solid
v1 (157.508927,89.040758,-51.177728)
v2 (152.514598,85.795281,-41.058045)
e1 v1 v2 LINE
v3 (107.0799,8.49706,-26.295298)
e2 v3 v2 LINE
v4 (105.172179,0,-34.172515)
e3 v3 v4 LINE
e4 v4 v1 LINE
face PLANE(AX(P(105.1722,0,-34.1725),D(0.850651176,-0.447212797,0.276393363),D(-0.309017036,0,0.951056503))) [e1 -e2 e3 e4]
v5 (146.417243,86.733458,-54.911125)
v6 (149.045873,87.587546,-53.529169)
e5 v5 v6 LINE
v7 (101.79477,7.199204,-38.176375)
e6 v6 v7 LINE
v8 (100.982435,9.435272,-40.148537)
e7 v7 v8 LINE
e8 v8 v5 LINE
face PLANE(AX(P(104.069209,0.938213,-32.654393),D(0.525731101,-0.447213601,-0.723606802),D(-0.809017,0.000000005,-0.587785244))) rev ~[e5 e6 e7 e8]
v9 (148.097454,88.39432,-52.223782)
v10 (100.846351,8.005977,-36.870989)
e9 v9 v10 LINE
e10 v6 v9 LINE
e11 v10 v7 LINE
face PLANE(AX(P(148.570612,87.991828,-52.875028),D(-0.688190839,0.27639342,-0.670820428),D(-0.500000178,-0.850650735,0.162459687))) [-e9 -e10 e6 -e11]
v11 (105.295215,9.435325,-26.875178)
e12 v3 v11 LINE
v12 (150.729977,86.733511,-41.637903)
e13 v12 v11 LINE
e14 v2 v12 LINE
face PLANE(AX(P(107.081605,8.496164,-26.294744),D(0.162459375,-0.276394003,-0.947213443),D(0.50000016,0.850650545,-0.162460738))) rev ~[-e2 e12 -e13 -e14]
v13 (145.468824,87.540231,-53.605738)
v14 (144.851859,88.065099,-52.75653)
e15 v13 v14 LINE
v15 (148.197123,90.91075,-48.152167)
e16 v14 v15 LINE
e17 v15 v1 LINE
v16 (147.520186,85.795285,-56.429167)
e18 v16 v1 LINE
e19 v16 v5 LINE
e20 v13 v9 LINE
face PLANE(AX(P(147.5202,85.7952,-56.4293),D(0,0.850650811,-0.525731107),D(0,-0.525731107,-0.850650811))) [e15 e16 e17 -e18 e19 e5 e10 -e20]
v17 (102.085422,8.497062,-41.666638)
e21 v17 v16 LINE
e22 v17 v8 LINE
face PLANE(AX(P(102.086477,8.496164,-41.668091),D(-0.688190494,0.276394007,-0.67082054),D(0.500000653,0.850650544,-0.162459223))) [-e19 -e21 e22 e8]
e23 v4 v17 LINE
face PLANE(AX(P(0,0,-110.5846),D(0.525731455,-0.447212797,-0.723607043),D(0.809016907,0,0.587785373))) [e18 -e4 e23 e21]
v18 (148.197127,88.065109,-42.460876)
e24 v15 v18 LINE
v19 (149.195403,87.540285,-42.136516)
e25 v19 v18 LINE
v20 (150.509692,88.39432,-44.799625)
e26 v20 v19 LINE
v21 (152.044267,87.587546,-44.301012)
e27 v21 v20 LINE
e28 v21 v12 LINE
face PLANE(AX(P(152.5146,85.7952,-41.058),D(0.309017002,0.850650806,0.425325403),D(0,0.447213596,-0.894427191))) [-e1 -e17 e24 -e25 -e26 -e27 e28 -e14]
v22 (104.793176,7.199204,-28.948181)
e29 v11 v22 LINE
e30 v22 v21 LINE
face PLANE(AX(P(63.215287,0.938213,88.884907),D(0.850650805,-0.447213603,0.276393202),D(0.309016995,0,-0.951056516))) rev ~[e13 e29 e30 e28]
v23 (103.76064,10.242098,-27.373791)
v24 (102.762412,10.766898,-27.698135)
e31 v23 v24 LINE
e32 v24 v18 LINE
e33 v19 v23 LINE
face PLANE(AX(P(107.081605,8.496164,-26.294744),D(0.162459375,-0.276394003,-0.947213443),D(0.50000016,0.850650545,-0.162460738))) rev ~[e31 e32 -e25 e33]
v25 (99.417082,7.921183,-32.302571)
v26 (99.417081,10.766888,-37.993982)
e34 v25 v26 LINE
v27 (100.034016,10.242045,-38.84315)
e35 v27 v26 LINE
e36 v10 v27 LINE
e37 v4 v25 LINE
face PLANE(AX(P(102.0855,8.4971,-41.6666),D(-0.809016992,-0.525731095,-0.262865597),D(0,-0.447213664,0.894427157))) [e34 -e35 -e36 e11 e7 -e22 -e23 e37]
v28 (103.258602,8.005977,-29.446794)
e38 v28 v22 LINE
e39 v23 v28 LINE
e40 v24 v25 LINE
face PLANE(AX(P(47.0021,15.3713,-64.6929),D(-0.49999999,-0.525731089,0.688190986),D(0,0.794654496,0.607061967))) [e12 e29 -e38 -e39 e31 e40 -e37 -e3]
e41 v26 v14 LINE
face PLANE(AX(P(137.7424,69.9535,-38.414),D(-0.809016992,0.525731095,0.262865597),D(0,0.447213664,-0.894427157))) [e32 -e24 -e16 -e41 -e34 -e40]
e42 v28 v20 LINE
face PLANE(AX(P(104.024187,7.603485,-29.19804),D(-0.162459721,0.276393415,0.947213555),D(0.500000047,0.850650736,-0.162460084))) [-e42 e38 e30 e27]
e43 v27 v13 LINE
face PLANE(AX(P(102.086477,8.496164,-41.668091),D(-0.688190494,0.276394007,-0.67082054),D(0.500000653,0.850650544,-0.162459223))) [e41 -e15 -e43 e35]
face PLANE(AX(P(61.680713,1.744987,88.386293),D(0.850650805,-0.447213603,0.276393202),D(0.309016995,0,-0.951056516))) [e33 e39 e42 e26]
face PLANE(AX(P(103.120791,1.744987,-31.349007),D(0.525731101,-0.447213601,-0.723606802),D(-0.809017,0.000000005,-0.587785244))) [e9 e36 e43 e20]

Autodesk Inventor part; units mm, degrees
sketch "Boceto1" plane through (0, 0, 0) normal (0, 1, 0) x (-1, 0, 0)
  line L0 (65, 89.4648) -> (105.1722, -34.1725)
  line L1 (105.1722, -34.1725) -> (0, -110.5846)
  line L2 (0, -110.5846) -> (-105.1722, -34.1725)
  line L3 (-105.1722, -34.1725) -> (-65, 89.4648)
  line L4 (-65, 89.4648) -> (65, 89.4648)
  line L5 (0, 0) -> (178.9296, 0) construction
  line L6 (178.9296, 0) -> (178.9296, 178.9296) construction
  line L7 (178.9296, 178.9296) -> (0, 178.9296) construction
  line L8 (0, 178.9296) -> (0, 0) construction
  line L9 (178.9296, 178.9296) -> (0, 89.4648)
  dimension "d1" = 289.5143
  dimension "d2" = 26.565
  dimension "d108" = 130
extrude "Extrusión1" add sketch "Boceto1" along normal blind 289.5143 draft 26.565
sketch "Boceto2" plane through (0, 289.5143, 0) normal (0, 1, 0) x (1, 0, 0)
  line L0 (0, -80.8118) -> (-76.8566, -24.9722)
  line L1 (-76.8566, -24.9722) -> (-47.5, 65.3781)
  line L2 (-47.5, 65.3781) -> (47.5, 65.3781)
  line L3 (47.5, 65.3781) -> (76.8566, -24.9722)
  line L4 (76.8566, -24.9722) -> (0, -80.8118)
  point P0 (0, 0)
  point P1 (0, 0)
  dimension "L" = 95
extrude "Extrusión2" cut sketch "Boceto2" against normal blind 289.5143 draft 26.565 keep common part
sketch "Boceto3" plane through (65, 0, 89.4648) normal (0.8506508, -0.4472136, 0.2763932) x (0.309017, 0, -0.9510565)
  line L0 (65, 170.2767) -> (162.346, 99.5507) projected
  line L1 (-32.346, 99.5507) -> (65, 170.2767) projected
  line L2 (0, 0) -> (-32.346, 99.5507) projected
  line L3 (0, 0) -> (130, 0) projected
  line L4 (130, 0) -> (162.346, 99.5507) projected
  line L5 (151.1781, 95.922) -> (65, 158.534)
  line L6 (65, 158.534) -> (-21.1781, 95.922)
  line L7 (-21.1781, 95.922) -> (6.9022, 9.5)
  line L8 (6.9022, 9.5) -> (123.0978, 9.5)
  line L9 (123.0978, 9.5) -> (151.1781, 95.922)
  point P0 (65, -40.0099)
  dimension "D" = 9.5
extrude "Extrusión3" cut sketch "Boceto3" against normal blind 189.5143 contours L9 L8 L7 L6 L5
sketch "Boceto4" plane through (105.1722, 0, -34.1725) normal (0.5257311, -0.4472136, -0.7236068) x (-0.809017, 0, -0.5877853)
  line L0 (65, 170.2767) -> (162.346, 99.5507) projected
  line L1 (-32.346, 99.5507) -> (65, 170.2767) projected
  line L2 (0, 0) -> (-32.346, 99.5507) projected
  line L3 (0, 0) -> (130, 0) projected
  line L4 (130, 0) -> (162.346, 99.5507) projected
  line L5 (123.0978, 9.5) -> (6.9022, 9.5)
  line L6 (6.9022, 9.5) -> (-21.1781, 95.922)
  line L7 (-21.1781, 95.922) -> (65, 158.534)
  line L8 (65, 158.534) -> (151.1781, 95.922)
  line L9 (151.1781, 95.922) -> (123.0978, 9.5)
  point P0 (65, -40.0099)
  dimension "d14" = 9.5
extrude "Extrusión4" cut sketch "Boceto4" against normal blind 189.5143 contours L5 L6 L7 L8 L9
sketch "Boceto5" plane through (0, 0, 0) normal (0, -1, 0) x (1, 0, 0)
  line L0 (105.1722, -34.1725) -> (0, -110.5846) projected
  line L1 (65, 89.4648) -> (105.1722, -34.1725) projected
  line L2 (-65, 89.4648) -> (65, 89.4648) projected
  line L3 (-105.1722, -34.1725) -> (-65, 89.4648) projected
  line L4 (0, -110.5846) -> (-105.1722, -34.1725) projected
  line L5 (58.0978, 79.9648) -> (94.0043, -30.5438)
  line L6 (94.0043, -30.5438) -> (0, -98.842)
  line L7 (0, -98.842) -> (-94.0043, -30.5438)
  line L8 (-94.0043, -30.5438) -> (-58.0978, 79.9648)
  line L9 (-58.0978, 79.9648) -> (58.0978, 79.9648)
  point P0 (0, 0)
  dimension "d17" = 9.5
extrude "Extrusión5" cut sketch "Boceto5" against normal blind 189.5143 contours L5 L6 L7 L8 L9
sketch "Boceto6" plane through (47.5, 289.5143, -65.3781) normal (0, 0.4472136, -0.8944272) x (-1, 0, 0)
  line L0 (47.5, -224.1361) -> (144.846, -153.4101) projected
  line L1 (95, 0) -> (144.846, -153.4101) projected
  line L2 (95, 0) -> (0, 0) projected
  line L3 (0, 0) -> (-49.846, -153.4101) projected
  line L4 (-49.846, -153.4101) -> (47.5, -224.1361) projected
  line L5 (133.6781, -149.7814) -> (47.5, -212.3935)
  line L6 (47.5, -212.3935) -> (-38.6781, -149.7814)
  line L7 (-38.6781, -149.7814) -> (6.9022, -9.5)
  line L8 (6.9022, -9.5) -> (88.0978, -9.5)
  line L9 (88.0978, -9.5) -> (133.6781, -149.7814)
  point P0 (47.5, -229.7114)
  dimension "d20" = 9.5
extrude "Extrusión6" cut sketch "Boceto6" against normal blind 189.5143 contours L5 L6 L7 L8 L9
sketch "Boceto7" plane through (0, 0, -110.5846) normal (-0.5257311, -0.4472136, -0.7236068) x (-0.809017, 0, 0.5877853)
  line L0 (65, 170.2767) -> (162.346, 99.5507) projected
  line L1 (-32.346, 99.5507) -> (65, 170.2767) projected
  line L2 (0, 0) -> (-32.346, 99.5507) projected
  line L3 (0, 0) -> (130, 0) projected
  line L4 (130, 0) -> (162.346, 99.5507) projected
  line L5 (151.1781, 95.922) -> (65, 158.534)
  line L6 (65, 158.534) -> (-21.1781, 95.922)
  line L7 (-21.1781, 95.922) -> (6.9022, 9.5)
  line L8 (6.9022, 9.5) -> (123.0978, 9.5)
  line L9 (123.0978, 9.5) -> (151.1781, 95.922)
  point P0 (65, -40.0099)
  dimension "d23" = 9.5
extrude "Extrusión7" cut sketch "Boceto7" against normal blind 189.5143 contours L9 L8 L7 L6 L5
sketch "Boceto8" plane through (76.8566, 289.5143, 24.9722) normal (0.8506508, 0.4472136, -0.2763932) x (-0.309017, 0, -0.9510565)
  line L0 (47.5, -224.1361) -> (144.846, -153.4101) projected
  line L1 (95, 0) -> (144.846, -153.4101) projected
  line L2 (95, 0) -> (0, 0) projected
  line L3 (0, 0) -> (-49.846, -153.4101) projected
  line L4 (-49.846, -153.4101) -> (47.5, -224.1361) projected
  line L5 (47.5, -212.3935) -> (133.6781, -149.7814)
  line L6 (133.6781, -149.7814) -> (88.0978, -9.5)
  line L7 (88.0978, -9.5) -> (6.9022, -9.5)
  line L8 (6.9022, -9.5) -> (-38.6781, -149.7814)
  line L9 (-38.6781, -149.7814) -> (47.5, -212.3935)
  point P0 (47.5, -229.7114)
  dimension "d26" = 9.5
extrude "Extrusión8" cut sketch "Boceto8" against normal blind 189.5143 contours L9 L8 L7 L6 L5
sketch "Boceto9" plane through (0, 289.5143, 0) normal (0, 1, 0) x (1, 0, 0)
  line L0 (78.7643, -17.095) -> (-82.4461, -69.4755) projected
  line L1 (-47.5, 65.3781) -> (47.5, 65.3781) projected
  line L2 (-76.8566, -24.9722) -> (-47.5, 65.3781) projected
  line L3 (0, -80.8118) -> (-76.8566, -24.9722) projected
  line L4 (76.8566, -24.9722) -> (0, -80.8118) projected
  line L5 (47.5, 65.3781) -> (76.8566, -24.9722) projected
  line L6 (0, -69.0692) -> (-65.6887, -21.3436)
  line L7 (-65.6887, -21.3436) -> (-40.5978, 55.8781)
  line L8 (-40.5978, 55.8781) -> (40.5978, 55.8781)
  line L9 (40.5978, 55.8781) -> (65.6887, -21.3436)
  line L10 (65.6887, -21.3436) -> (0, -69.0692)
  point P0 (0, 0)
  dimension "d29" = 9.5
extrude "Extrusión9" cut sketch "Boceto9" against normal blind 189.5143 contours L10 L6 L0 | L0 L6 L7 L8 L9
sketch "Boceto10" plane through (-47.5, 289.5143, -65.3781) normal (-0.8506508, 0.4472136, -0.2763932) x (-0.309017, 0, 0.9510565)
  line L0 (-49.846, -153.4101) -> (47.5, -224.1361) projected
  line L1 (47.5, -224.1361) -> (144.846, -153.4101) projected
  line L2 (95, 0) -> (144.846, -153.4101) projected
  line L3 (95, 0) -> (0, 0) projected
  line L4 (0, 0) -> (-49.846, -153.4101) projected
  line L5 (133.6781, -149.7814) -> (47.5, -212.3935)
  line L6 (47.5, -212.3935) -> (-38.6781, -149.7814)
  line L7 (-38.6781, -149.7814) -> (6.9022, -9.5)
  line L8 (6.9022, -9.5) -> (88.0978, -9.5)
  line L9 (88.0978, -9.5) -> (133.6781, -149.7814)
  point P0 (47.5, -229.7114)
  dimension "d32" = 9.5
extrude "Extrusión10" cut sketch "Boceto10" against normal blind 189.5143 contours L5 L6 L7 L8 L9
sketch "Boceto11" plane through (-105.1722, 0, -34.1725) normal (-0.8506508, -0.4472136, 0.2763932) x (0.309017, 0, 0.9510565)
  line L0 (93.5693, 85.4327) -> (113.4241, 91.884) projected
  line L1 (-32.346, 99.5507) -> (65, 170.2767) projected
  line L2 (0, 0) -> (-32.346, 99.5507) projected
  line L3 (0, 0) -> (130, 0) projected
  line L4 (130, 0) -> (162.346, 99.5507) projected
  line L5 (65, 170.2767) -> (162.346, 99.5507) projected
  line L6 (151.1781, 95.922) -> (123.0978, 9.5)
  line L7 (123.0978, 9.5) -> (6.9022, 9.5)
  line L8 (6.9022, 9.5) -> (-21.1781, 95.922)
  line L9 (-21.1781, 95.922) -> (65, 158.534)
  line L10 (65, 158.534) -> (151.1781, 95.922)
  point P0 (65, -40.0099)
  point P1 (48.882, 67.2803)
  point P2 (90.6407, 79.3954)
  point P3 (78.7461, 79.1633)
  dimension "d35" = 9.5
extrude "Extrusión11" cut sketch "Boceto11" against normal blind 189.5143 contours L6 L7 L8 L9 L10
sketch "Boceto12" plane through (-65, 0, 89.4648) normal (0, -0.4472136, 0.8944272) x (1, 0, 0)
  line L0 (6.9022, 9.5) -> (97.7716, 134.5711) projected
  line L1 (-32.346, 99.5507) -> (65, 170.2767) projected
  line L2 (0, 0) -> (-32.346, 99.5507) projected
  line L3 (0, 0) -> (130, 0) projected
  line L4 (130, 0) -> (162.346, 99.5507) projected
  line L5 (65, 170.2767) -> (162.346, 99.5507) projected
  line L6 (151.1781, 95.922) -> (123.0978, 9.5)
  line L7 (123.0978, 9.5) -> (6.9022, 9.5)
  line L8 (6.9022, 9.5) -> (-21.1781, 95.922)
  line L9 (-21.1781, 95.922) -> (65, 158.534)
  line L10 (65, 158.534) -> (151.1781, 95.922)
  point P0 (65, -40.0099)
  point P1 (52.5, 72.2601)
  point P2 (45.5555, 62.7017)
  dimension "d38" = 9.5
extrude "Extrusión12" cut sketch "Boceto12" against normal blind 189.5143 contours L6 L7 L8 L9 L10
sketch "Boceto13" plane through (0, 289.5143, 80.8118) normal (0.5257311, 0.4472136, 0.7236068) x (0.809017, 0, -0.5877853)
  line L0 (-49.846, -153.4101) -> (47.5, -224.1361) projected
  line L1 (47.5, -224.1361) -> (144.846, -153.4101) projected
  line L2 (95, 0) -> (144.846, -153.4101) projected
  line L3 (95, 0) -> (0, 0) projected
  line L4 (0, 0) -> (-49.846, -153.4101) projected
  line L5 (47.5, -212.3935) -> (-38.6781, -149.7814)
  line L6 (-38.6781, -149.7814) -> (6.9022, -9.5)
  line L7 (6.9022, -9.5) -> (88.0978, -9.5)
  line L8 (88.0978, -9.5) -> (133.6781, -149.7814)
  line L9 (133.6781, -149.7814) -> (47.5, -212.3935)
  point P0 (47.5, -229.7114)
  dimension "d41" = 9.5
extrude "Extrusión13" cut sketch "Boceto13" against normal blind 189.5143 contours L5 L6 L7 L8 L9
sketch "Boceto14" plane through (-76.8566, 289.5143, 24.9722) normal (-0.5257311, 0.4472136, 0.7236068) x (0.809017, 0, 0.5877853)
  line L0 (-49.846, -153.4101) -> (47.5, -224.1361) projected
  line L1 (47.5, -224.1361) -> (144.846, -153.4101) projected
  line L2 (95, 0) -> (144.846, -153.4101) projected
  line L3 (95, 0) -> (0, 0) projected
  line L4 (0, 0) -> (-49.846, -153.4101) projected
  line L5 (-38.6781, -149.7814) -> (47.5, -212.3935)
  line L6 (47.5, -212.3935) -> (133.6781, -149.7814)
  line L7 (133.6781, -149.7814) -> (88.0978, -9.5)
  line L8 (88.0978, -9.5) -> (6.9022, -9.5)
  line L9 (6.9022, -9.5) -> (-38.6781, -149.7814)
  point P0 (47.5, -229.7114)
  dimension "d44" = 9.5
extrude "Extrusión14" cut sketch "Boceto14" against normal blind 189.5143 contours L9 L8 L7 L6 L5
ref_plane "Plano de trabajo1" through (47.5, 288.1726, -62.6949) normal (0, 0.4472136, -0.8944272) x (-1, 0, 0)
sketch "Boceto15" plane through (47.5, 288.1726, -62.6949) normal (0, 0.4472136, -0.8944272) x (-1, 0, 0)
  line L0 (6.9022, -9.5) -> (88.0978, -9.5) projected
  line L1 (-38.6781, -149.7814) -> (6.9022, -9.5) projected
  line L2 (47.5, -212.3935) -> (-38.6781, -149.7814) projected
  line L3 (133.6781, -149.7814) -> (47.5, -212.3935) projected
  line L4 (88.0978, -9.5) -> (133.6781, -149.7814) projected
  line L5 (5.0858, -7) -> (89.9142, -7)
  line L6 (89.9142, -7) -> (136.617, -150.7364)
  line L7 (136.617, -150.7364) -> (47.5, -215.4836)
  line L8 (47.5, -215.4836) -> (-41.617, -150.7364)
  line L9 (-41.617, -150.7364) -> (5.0858, -7)
  point P0 (47.5, -229.7114)
  dimension "D2" = 2.5
extrude "Extrusión15" cut sketch "Boceto15" along normal mid plane 1.8 contours L0 L4 L3 L2 L1 | L5 L6 L7 L8 L9
ref_plane "Plano de trabajo2" through (103.595, 1.3416, -32.0017) normal (0.5257311, -0.4472136, -0.7236068) x (-0.809017, 0, -0.5877853)
sketch "Boceto16" plane through (103.595, 1.3416, -32.0017) normal (0.5257311, -0.4472136, -0.7236068) x (-0.809017, 0, -0.5877853)
  line L0 (123.0978, 9.5) -> (6.9022, 9.5) projected
  line L1 (151.1781, 95.922) -> (123.0978, 9.5) projected
  line L2 (65, 158.534) -> (151.1781, 95.922) projected
  line L3 (-21.1781, 95.922) -> (65, 158.534) projected
  line L4 (6.9022, 9.5) -> (-21.1781, 95.922) projected
  line L5 (5.0858, 7) -> (124.9142, 7)
  line L6 (124.9142, 7) -> (154.117, 96.8769)
  line L7 (154.117, 96.8769) -> (65, 161.6242)
  line L8 (65, 161.6242) -> (-24.117, 96.8769)
  line L9 (-24.117, 96.8769) -> (5.0858, 7)
  point P0 (65, -40.0099)
  dimension "d52" = 2.5
extrude "Extrusión16" cut sketch "Boceto16" along normal mid plane 1.8
ref_plane "Plano de trabajo3" through (74.3047, 288.1726, 25.8014) normal (0.8506508, 0.4472136, -0.2763932) x (-0.309017, 0, -0.9510565)
sketch "Boceto17" plane through (74.3047, 288.1726, 25.8014) normal (0.8506508, 0.4472136, -0.2763932) x (-0.309017, 0, -0.9510565)
  line L0 (47.5, -212.3935) -> (-38.6781, -149.7814) projected
  line L1 (133.6781, -149.7814) -> (47.5, -212.3935) projected
  line L2 (88.0978, -9.5) -> (133.6781, -149.7814) projected
  line L3 (6.9022, -9.5) -> (88.0978, -9.5) projected
  line L4 (-38.6781, -149.7814) -> (6.9022, -9.5) projected
  line L5 (-41.617, -150.7364) -> (47.5, -215.4836)
  line L6 (47.5, -215.4836) -> (136.617, -150.7364)
  line L7 (136.617, -150.7364) -> (89.9142, -7)
  line L8 (89.9142, -7) -> (5.0858, -7)
  line L9 (5.0858, -7) -> (-41.617, -150.7364)
  point P0 (47.5, -229.7114)
  dimension "d56" = 2.5
extrude "Extrusión17" cut sketch "Boceto17" along normal mid plane 1.8
ref_plane "Plano de trabajo4" through (1.5772, 1.3416, -108.4138) normal (-0.5257311, -0.4472136, -0.7236068) x (-0.809017, 0, 0.5877853)
sketch "Boceto18" plane through (1.5772, 1.3416, -108.4138) normal (-0.5257311, -0.4472136, -0.7236068) x (-0.809017, 0, 0.5877853)
  line L0 (151.1781, 95.922) -> (123.0978, 9.5) projected
  line L1 (65, 158.534) -> (151.1781, 95.922) projected
  line L2 (-21.1781, 95.922) -> (65, 158.534) projected
  line L3 (6.9022, 9.5) -> (-21.1781, 95.922) projected
  line L4 (123.0978, 9.5) -> (6.9022, 9.5) projected
  line L5 (124.9142, 7) -> (154.117, 96.8769)
  line L6 (154.117, 96.8769) -> (65, 161.6242)
  line L7 (65, 161.6242) -> (-24.117, 96.8769)
  line L8 (-24.117, 96.8769) -> (5.0858, 7)
  line L9 (5.0858, 7) -> (124.9142, 7)
  point P0 (65, -40.0099)
  dimension "d60" = 2.5
extrude "Extrusión18" cut sketch "Boceto18" along normal mid plane 1.8 contours L0 L4 L3 L2 L1 | L9 L8 L7 L6 L5
ref_plane "Plano de trabajo5" through (0, 3, 0) normal (0, -1, 0) x (1, 0, 0)
sketch "Boceto19" plane through (0, 3, 0) normal (0, -1, 0) x (1, 0, 0)
  line L0 (0, -98.842) -> (-94.0043, -30.5438) projected
  line L1 (-94.0043, -30.5438) -> (-58.0978, 79.9648) projected
  line L2 (-58.0978, 79.9648) -> (58.0978, 79.9648) projected
  line L3 (58.0978, 79.9648) -> (94.0043, -30.5438) projected
  line L4 (94.0043, -30.5438) -> (0, -98.842) projected
  line L5 (105.1722, -34.1725) -> (0, -110.5846) projected
  line L6 (65, 89.4648) -> (105.1722, -34.1725) projected
  line L7 (-65, 89.4648) -> (65, 89.4648) projected
  line L8 (-105.1722, -34.1725) -> (-65, 89.4648) projected
  line L9 (0, -110.5846) -> (-105.1722, -34.1725) projected
  line L10 (-59.9142, 82.4648) -> (-96.9432, -31.4988)
  line L11 (-96.9432, -31.4988) -> (0, -101.9321)
  line L12 (0, -101.9321) -> (96.9432, -31.4988)
  line L13 (96.9432, -31.4988) -> (59.9142, 82.4648)
  line L14 (59.9142, 82.4648) -> (-59.9142, 82.4648)
  point P0 (0, 0)
  dimension "d64" = 2.5
extrude "Extrusión19" cut sketch "Boceto19" along normal mid plane 1.8 contours L0 L1 L2 L3 L4 | L14 L13 L12 L11 L10
ref_plane "Plano de trabajo6" through (62.448, 1.3416, 88.6356) normal (0.8506508, -0.4472136, 0.2763932) x (0.309017, 0, -0.9510565)
sketch "Boceto20" plane through (62.448, 1.3416, 88.6356) normal (0.8506508, -0.4472136, 0.2763932) x (0.309017, 0, -0.9510565)
  line L0 (6.9022, 9.5) -> (-21.1781, 95.922) projected
  line L1 (-21.1781, 95.922) -> (65, 158.534) projected
  line L2 (65, 158.534) -> (151.1781, 95.922) projected
  line L3 (151.1781, 95.922) -> (123.0978, 9.5) projected
  line L4 (123.0978, 9.5) -> (6.9022, 9.5) projected
  line L5 (65, 170.2767) -> (162.346, 99.5507) projected
  line L6 (-32.346, 99.5507) -> (65, 170.2767) projected
  line L7 (0, 0) -> (-32.346, 99.5507) projected
  line L8 (0, 0) -> (130, 0) projected
  line L9 (130, 0) -> (162.346, 99.5507) projected
  line L10 (-24.117, 96.8769) -> (5.0858, 7)
  line L11 (5.0858, 7) -> (124.9142, 7)
  line L12 (124.9142, 7) -> (154.117, 96.8769)
  line L13 (154.117, 96.8769) -> (65, 161.6242)
  line L14 (65, 161.6242) -> (-24.117, 96.8769)
  point P0 (65, -40.0099)
  dimension "d68" = 2.5
extrude "Extrusión20" cut sketch "Boceto20" along normal mid plane 1.8 contours L0 L1 L2 L3 L4 | L14 L13 L12 L11 L10
ref_plane "Plano de trabajo7" through (152.5146, 99.5438, -49.555) normal (-0.309017, 0, -0.9510565) x (-0.8506508, -0.4472136, 0.2763932)
split body "Dividir1" result two bodies by plane through (152.5146, 99.5438, -49.555) normal (-0.309017, 0, -0.9510565) first body at (-65.7478, 240.7202, -86.3585)
ref_plane "Plano de trabajo8" through (147.5202, 85.7952, -56.4293) normal (0, -0.8506508, 0.5257311) x (-0.5257311, 0.4472136, 0.7236068)
split "Dividir2" plane through (147.5202, 85.7952, -56.4293) removes the side toward (0, 0.8506508, -0.5257311)
ref_plane "Plano de trabajo9" through (152.5146, 85.7952, -41.058) normal (-0.309017, -0.8506508, -0.4253254) x (-0.8506508, 0.4472136, -0.2763932)
split "Dividir3" plane through (152.5146, 85.7952, -41.058) removes the side toward (0.309017, 0.8506508, 0.4253254)
ref_plane "Plano de trabajo13" through (47.0021, 15.3713, -64.6929) normal (-0.5, -0.5257311, 0.688191) x (0.809017, 0, 0.5877853)
split "Dividir7" plane through (47.0021, 15.3713, -64.6929) removes the side toward (-0.5, -0.5257311, 0.688191)
ref_plane "Plano de trabajo14" through (102.0855, 8.4971, -41.6666) normal (-0.809017, -0.5257311, -0.2628656) x (-0.5257311, 0.4472136, 0.7236068)
split "Dividir8" plane through (102.0855, 8.4971, -41.6666) removes the side toward (-0.809017, -0.5257311, -0.2628656)
ref_plane "Plano de trabajo16" through (137.7424, 69.9535, -38.414) normal (-0.809017, 0.5257311, 0.2628656) x (0.5, 0.8506508, -0.1624598)
ref_plane "Plano de trabajo15" through (138.5514, 69.4278, -38.6769) normal (-0.809017, 0.5257311, 0.2628656) x (0.5, 0.8506508, -0.1624598)
combine bodies "Combinar1" operation type add bodies to combine 2 3
split "Dividir9" plane through (137.7424, 69.9535, -38.414) removes the side toward (-0.809017, 0.5257311, 0.2628656)
sketch "Boceto25" plane through (99.4171, 10.7669, -37.9939) normal (-0.809017, 0.5257311, 0.2628656) x (0.309017, 0, 0.9510565)
  line L0 (5.4128, -6.9022) -> (5.4128, 97.7716) projected
  line L1 (0, 90.8695) -> (5.4128, 94.2147) projected
  line L2 (0, 0) -> (0, 90.8695) projected
  line L3 (5.4128, -3.3453) -> (0, 0) projected
  line L4 (10.8256, 0) -> (5.4128, -3.3453) projected
  line L5 (10.8256, 90.8695) -> (10.8256, 0) projected
  line L6 (5.4128, 94.2147) -> (10.8256, 90.8695) projected
  point P0 (5.4128, -65.0399)
  dimension "d109" = 10.8256
equation "\"d3\" = d1"
equation "\"d4\" = d2"
equation "\"d6\" = d1"
equation "\"d7\" = d2"
equation "\"d14\" = D"
equation "\"d17\" = D"
equation "\"d20\" = D"
equation "\"d23\" = D"
equation "\"d26\" = D"
equation "\"d29\" = D"
equation "\"d32\" = D"
equation "\"d35\" = D"
equation "\"d38\" = D"
equation "\"d41\" = D"
equation "\"d44\" = D"
equation "\"d48\" = ESP"
equation "\"d52\" = D2"
equation "\"d56\" = D2"
equation "\"d57\" = ESP"
equation "\"d60\" = D2"
equation "\"d61\" = ESP"
equation "\"d64\" = D2"
equation "\"d65\" = ESP"
equation "\"d68\" = D2"
equation "\"d69\" = ESP"
equation "\"d51\" = P"
equation "\"d55\" = P"
equation "\"d59\" = P"
equation "\"d63\" = P"
equation "\"d67\" = P"
equation "\"ESP\" = 1.8"
equation "\"P\" = -3"
properties part number "Perfil_V2"
